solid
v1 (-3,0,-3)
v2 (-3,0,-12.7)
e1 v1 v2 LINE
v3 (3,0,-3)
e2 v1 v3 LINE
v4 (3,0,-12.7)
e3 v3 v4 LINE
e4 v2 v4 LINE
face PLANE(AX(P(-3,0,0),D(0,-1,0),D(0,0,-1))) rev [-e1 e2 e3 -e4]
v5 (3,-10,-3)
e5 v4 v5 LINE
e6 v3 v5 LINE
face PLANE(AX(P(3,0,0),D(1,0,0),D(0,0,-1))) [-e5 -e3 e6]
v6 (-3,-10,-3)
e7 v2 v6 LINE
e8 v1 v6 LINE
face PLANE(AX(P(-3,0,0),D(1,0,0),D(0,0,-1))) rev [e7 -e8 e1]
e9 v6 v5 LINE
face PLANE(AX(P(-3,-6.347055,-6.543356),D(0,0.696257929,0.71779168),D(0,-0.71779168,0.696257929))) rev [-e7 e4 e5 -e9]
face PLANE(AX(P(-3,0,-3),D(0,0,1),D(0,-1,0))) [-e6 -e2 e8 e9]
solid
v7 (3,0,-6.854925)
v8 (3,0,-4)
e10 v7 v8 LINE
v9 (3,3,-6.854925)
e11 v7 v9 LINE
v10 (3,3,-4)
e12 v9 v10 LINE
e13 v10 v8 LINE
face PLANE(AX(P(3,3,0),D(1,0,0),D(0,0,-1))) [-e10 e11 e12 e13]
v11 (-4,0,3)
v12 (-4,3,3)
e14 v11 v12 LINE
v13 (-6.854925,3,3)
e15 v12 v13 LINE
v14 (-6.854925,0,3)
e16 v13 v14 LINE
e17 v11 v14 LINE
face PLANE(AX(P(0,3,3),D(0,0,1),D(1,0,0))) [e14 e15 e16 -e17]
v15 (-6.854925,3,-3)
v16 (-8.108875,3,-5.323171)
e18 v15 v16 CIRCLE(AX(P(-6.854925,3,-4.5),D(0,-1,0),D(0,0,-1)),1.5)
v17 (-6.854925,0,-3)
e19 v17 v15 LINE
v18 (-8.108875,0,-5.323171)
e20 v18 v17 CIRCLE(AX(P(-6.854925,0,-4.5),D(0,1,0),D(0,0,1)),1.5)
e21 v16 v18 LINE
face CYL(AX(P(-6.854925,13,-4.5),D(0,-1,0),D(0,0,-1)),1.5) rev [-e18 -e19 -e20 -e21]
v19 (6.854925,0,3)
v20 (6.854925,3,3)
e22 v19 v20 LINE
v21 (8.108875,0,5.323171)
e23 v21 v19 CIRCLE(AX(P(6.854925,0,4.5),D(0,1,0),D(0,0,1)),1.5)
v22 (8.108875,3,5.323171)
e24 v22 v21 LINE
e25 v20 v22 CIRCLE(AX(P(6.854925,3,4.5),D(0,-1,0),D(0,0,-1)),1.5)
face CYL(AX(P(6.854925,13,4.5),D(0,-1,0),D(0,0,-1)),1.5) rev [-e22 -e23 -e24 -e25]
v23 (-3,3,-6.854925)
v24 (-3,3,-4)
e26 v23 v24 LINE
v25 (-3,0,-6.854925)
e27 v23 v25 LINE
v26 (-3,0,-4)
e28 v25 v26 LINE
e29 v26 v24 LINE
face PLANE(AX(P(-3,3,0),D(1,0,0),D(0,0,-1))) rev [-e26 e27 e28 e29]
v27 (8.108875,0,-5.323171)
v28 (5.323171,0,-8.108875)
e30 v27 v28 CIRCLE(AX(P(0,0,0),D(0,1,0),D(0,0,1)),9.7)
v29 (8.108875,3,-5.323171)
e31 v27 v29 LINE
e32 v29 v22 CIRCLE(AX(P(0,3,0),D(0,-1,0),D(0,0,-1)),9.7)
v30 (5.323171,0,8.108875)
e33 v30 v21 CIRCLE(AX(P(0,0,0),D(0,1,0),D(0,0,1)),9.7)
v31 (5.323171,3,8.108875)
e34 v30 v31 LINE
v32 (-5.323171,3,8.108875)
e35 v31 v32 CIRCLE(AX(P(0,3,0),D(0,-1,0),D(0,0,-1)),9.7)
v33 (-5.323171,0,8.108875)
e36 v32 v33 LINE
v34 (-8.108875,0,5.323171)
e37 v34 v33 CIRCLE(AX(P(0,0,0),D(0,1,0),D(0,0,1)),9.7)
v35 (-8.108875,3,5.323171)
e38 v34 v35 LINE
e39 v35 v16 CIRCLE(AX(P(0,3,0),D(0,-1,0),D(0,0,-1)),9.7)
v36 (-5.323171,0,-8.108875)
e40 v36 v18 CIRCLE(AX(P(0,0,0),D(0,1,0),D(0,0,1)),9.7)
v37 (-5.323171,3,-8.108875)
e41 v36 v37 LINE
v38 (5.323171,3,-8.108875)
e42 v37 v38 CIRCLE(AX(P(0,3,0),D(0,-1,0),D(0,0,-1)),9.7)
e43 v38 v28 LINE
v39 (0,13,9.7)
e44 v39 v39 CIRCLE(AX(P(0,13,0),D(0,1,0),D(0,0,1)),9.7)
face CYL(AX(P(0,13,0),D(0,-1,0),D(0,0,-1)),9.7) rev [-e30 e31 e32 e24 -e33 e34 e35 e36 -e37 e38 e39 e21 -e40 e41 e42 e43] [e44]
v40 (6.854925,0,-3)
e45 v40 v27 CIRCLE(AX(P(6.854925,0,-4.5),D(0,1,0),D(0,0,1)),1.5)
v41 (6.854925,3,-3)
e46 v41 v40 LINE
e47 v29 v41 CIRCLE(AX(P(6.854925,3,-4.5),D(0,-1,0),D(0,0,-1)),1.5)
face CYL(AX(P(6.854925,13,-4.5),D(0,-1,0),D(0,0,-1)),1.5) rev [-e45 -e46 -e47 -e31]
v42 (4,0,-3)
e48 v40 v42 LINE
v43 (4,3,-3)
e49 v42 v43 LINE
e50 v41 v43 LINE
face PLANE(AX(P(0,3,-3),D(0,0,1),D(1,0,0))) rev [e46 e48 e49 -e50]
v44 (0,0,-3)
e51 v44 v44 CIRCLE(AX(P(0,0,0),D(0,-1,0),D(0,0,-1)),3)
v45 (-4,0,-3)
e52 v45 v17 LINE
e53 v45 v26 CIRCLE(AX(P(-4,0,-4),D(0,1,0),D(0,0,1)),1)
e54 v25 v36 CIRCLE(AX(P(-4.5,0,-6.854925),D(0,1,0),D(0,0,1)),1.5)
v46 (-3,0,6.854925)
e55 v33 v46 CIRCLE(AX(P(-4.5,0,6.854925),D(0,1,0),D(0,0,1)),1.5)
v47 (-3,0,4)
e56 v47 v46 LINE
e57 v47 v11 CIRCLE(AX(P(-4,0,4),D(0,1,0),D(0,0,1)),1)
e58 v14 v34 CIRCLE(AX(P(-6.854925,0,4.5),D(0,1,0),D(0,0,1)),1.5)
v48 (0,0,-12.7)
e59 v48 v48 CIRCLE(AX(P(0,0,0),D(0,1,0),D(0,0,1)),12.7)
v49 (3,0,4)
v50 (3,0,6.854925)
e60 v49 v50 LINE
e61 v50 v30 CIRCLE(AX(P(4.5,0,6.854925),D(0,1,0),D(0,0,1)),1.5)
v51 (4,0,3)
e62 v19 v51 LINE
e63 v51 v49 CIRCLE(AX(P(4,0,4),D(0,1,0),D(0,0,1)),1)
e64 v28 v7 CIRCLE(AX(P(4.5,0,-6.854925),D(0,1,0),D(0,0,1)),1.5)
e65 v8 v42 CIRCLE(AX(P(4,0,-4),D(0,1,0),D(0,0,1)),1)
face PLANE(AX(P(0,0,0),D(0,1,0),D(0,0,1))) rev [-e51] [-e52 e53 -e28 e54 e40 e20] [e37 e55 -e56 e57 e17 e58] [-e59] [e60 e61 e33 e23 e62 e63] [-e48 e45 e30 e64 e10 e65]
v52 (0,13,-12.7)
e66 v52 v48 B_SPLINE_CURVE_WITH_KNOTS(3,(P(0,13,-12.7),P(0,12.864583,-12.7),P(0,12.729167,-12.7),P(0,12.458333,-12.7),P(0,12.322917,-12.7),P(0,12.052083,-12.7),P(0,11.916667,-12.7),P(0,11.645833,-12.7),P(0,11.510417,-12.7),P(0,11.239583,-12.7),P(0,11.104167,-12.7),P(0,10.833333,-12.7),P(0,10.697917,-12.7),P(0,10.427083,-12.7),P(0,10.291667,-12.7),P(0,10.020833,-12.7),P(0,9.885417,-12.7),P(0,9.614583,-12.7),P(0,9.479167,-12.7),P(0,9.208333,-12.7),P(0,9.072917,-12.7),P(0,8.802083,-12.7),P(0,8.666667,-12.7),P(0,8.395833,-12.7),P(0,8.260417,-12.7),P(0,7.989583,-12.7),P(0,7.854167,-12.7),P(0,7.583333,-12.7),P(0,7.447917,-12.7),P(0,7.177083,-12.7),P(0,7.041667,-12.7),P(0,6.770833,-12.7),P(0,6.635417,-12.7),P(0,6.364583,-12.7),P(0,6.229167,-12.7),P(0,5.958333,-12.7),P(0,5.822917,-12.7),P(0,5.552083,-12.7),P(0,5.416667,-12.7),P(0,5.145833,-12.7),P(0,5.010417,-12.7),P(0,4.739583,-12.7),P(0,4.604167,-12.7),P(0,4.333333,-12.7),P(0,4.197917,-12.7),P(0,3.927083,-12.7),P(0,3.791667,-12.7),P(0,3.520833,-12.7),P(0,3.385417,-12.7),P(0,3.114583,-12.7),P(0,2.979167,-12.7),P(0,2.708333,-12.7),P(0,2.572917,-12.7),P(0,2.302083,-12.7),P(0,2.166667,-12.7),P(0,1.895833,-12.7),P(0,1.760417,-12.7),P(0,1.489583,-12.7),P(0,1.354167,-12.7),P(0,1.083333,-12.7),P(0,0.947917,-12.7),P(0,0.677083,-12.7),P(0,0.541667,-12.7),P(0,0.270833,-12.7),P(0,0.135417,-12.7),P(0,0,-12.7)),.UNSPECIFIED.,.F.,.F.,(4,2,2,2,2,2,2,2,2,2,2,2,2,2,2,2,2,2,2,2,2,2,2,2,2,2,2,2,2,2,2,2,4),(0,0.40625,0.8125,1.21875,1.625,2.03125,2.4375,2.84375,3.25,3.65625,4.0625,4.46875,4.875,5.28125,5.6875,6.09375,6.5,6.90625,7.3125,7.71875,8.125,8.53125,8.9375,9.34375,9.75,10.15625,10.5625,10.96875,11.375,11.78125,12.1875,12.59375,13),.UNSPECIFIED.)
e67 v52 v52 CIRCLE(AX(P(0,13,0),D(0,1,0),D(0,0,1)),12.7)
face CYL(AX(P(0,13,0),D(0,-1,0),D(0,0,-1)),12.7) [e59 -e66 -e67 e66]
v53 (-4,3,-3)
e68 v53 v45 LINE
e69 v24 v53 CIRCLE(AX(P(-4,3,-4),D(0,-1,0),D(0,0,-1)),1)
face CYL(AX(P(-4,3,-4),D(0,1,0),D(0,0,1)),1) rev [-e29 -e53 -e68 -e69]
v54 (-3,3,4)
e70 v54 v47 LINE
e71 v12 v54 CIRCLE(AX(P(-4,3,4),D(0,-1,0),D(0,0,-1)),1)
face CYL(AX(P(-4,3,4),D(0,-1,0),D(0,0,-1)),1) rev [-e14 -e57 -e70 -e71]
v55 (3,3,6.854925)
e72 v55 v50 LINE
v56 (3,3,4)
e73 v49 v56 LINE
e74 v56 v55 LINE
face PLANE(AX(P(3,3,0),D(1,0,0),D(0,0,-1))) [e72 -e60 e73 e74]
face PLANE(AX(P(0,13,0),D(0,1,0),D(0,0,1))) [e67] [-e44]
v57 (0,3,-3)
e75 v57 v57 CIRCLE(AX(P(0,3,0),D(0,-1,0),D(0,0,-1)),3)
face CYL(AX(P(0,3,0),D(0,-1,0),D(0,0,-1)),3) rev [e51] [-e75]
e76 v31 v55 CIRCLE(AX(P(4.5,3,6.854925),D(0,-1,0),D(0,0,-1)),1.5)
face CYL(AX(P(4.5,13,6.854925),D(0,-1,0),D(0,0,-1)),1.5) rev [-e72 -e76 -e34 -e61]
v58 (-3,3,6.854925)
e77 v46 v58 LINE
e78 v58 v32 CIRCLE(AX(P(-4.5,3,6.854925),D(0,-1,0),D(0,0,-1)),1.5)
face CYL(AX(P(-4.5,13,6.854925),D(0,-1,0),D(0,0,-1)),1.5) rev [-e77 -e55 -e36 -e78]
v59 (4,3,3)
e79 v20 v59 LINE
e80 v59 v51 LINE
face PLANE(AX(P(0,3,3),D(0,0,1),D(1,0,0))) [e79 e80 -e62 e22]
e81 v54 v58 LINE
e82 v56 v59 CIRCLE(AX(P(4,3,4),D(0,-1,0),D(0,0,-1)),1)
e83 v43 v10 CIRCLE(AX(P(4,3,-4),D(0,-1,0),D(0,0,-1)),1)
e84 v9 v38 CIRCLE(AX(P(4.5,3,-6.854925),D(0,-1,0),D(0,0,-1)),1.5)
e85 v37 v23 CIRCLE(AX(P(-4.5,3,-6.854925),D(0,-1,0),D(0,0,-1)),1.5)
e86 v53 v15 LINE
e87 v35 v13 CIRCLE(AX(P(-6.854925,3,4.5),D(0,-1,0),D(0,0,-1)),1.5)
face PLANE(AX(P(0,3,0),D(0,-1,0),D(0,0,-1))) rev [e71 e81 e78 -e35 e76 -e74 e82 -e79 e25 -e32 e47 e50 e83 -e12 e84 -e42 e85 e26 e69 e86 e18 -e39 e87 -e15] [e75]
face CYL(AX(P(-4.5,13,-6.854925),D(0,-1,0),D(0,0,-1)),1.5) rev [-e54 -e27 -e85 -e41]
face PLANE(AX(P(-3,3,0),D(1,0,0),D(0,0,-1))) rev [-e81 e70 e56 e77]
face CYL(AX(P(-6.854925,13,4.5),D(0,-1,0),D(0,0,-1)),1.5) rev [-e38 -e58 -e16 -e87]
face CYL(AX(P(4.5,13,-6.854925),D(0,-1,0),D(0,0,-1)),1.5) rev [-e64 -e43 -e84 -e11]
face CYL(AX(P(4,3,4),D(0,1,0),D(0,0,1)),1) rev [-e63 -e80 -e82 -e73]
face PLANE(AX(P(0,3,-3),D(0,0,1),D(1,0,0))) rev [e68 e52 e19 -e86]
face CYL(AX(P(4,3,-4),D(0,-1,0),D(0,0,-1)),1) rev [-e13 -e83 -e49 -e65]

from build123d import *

# Parameters (mm, degrees)
ESBO_O1_R                     = 12.7
ESBO_O1_R_2                   = 9.7
RESSALTO_EXTRUS_O1_DEPTH      = 13
RESSALTO_EXTRUS_O7_DEPTH      = 3
FILETE1_R                     = 1.5
FILETE2_R                     = 1
RESSALTO_EXTRUS_O8_DEPTH      = 3
RESSALTO_EXTRUS_O8_DEPTH_BACK = 3


with BuildPart() as part:
    # Esboço1 → Ressalto-extrusão1 (new body)
    with BuildSketch(Plane(origin=(0, 0, 0), x_dir=(1, 0, 0), z_dir=(0, 1, 0))):
        with Locations(Location((0, 0, 0), (0, 0, 90))):
            Circle(ESBO_O1_R)
        with Locations(Location((0, 0, 0), (0, 0, 90))):
            Circle(ESBO_O1_R_2, mode=Mode.SUBTRACT)
    extrude(amount=RESSALTO_EXTRUS_O1_DEPTH)

    # Esboço5 → Ressalto-extrusão7 (add)
    with BuildSketch(Plane.XZ):
        with BuildLine():
            ThreePointArc((-10.270832488, -3), (-7.566042559, -7.566042559), (-3, -10.270832488))
            Line((-3, -10.270832488), (-3, -9.224424101))
            ThreePointArc((-3, -9.224424101), (-6.858935778, -6.858935778), (-9.224424101, -3))
            Line((-9.224424101, -3), (-10.270832488, -3))
        make_face()
        with BuildLine():
            ThreePointArc((-3, -10.270832488), (0, -10.7), (3, -10.270832488))
            Line((3, -10.270832488), (3, -9.224424101))
            ThreePointArc((3, -9.224424101), (0, -9.7), (-3, -9.224424101))
            Line((-3, -9.224424101), (-3, -10.270832488))
        make_face()
        with BuildLine():
            ThreePointArc((3, 10.270832488), (0, 10.7), (-3, 10.270832488))
            Line((-3, 10.270832488), (-3, 9.224424101))
            ThreePointArc((-3, 9.224424101), (0, 9.7), (3, 9.224424101))
            Line((3, 9.224424101), (3, 10.270832488))
        make_face()
        with BuildLine():
            Line((3, -9.224424101), (3, -10.270832488))
            ThreePointArc((3, -10.270832488), (7.566042559, -7.566042559), (10.270832488, -3))
            Line((10.270832488, -3), (9.224424101, -3))
            ThreePointArc((9.224424101, -3), (6.858935778, -6.858935778), (3, -9.224424101))
        make_face()
        with BuildLine():
            Line((9.224424101, -3), (10.270832488, -3))
            ThreePointArc((10.270832488, -3), (10.592164737, -1.515270995), (10.7, 0))
            ThreePointArc((10.7, 0), (10.592164737, 1.515270995), (10.270832488, 3))
            Line((10.270832488, 3), (9.224424101, 3))
            ThreePointArc((9.224424101, 3), (9.580368307, 1.518730756), (9.7, 0))
            ThreePointArc((9.7, 0), (9.580368307, -1.518730756), (9.224424101, -3))
        make_face()
        with BuildLine():
            ThreePointArc((-10.270832488, 3), (-10.7, 0), (-10.270832488, -3))
            Line((-10.270832488, -3), (-9.224424101, -3))
            ThreePointArc((-9.224424101, -3), (-9.7, 0), (-9.224424101, 3))
            Line((-9.224424101, 3), (-10.270832488, 3))
        make_face()
        with BuildLine():
            Line((9.224424101, 3), (10.270832488, 3))
            ThreePointArc((10.270832488, 3), (7.566042559, 7.566042559), (3, 10.270832488))
            Line((3, 10.270832488), (3, 9.224424101))
            ThreePointArc((3, 9.224424101), (6.858935778, 6.858935778), (9.224424101, 3))
        make_face()
        with BuildLine():
            ThreePointArc((-3, 10.270832488), (-7.566042559, 7.566042559), (-10.270832488, 3))
            Line((-10.270832488, 3), (-9.224424101, 3))
            ThreePointArc((-9.224424101, 3), (-6.858935778, 6.858935778), (-3, 9.224424101))
            Line((-3, 9.224424101), (-3, 10.270832488))
        make_face()
        with BuildLine():
            Line((-9.224424101, -3), (-3, -3))
            Line((-3, -3), (-3, 0))
            Line((-3, 0), (-3, 3))
            Line((-3, 3), (-9.224424101, 3))
            ThreePointArc((-9.224424101, 3), (-9.7, 0), (-9.224424101, -3))
        make_face()
        with BuildLine():
            ThreePointArc((-3, -9.224424101), (0, -9.7), (3, -9.224424101))
            Line((3, -9.224424101), (3, -3))
            Line((3, -3), (0, -3))
            Line((0, -3), (-3, -3))
            Line((-3, -3), (-3, -9.224424101))
        make_face()
        with BuildLine():
            Line((3, 0), (3, -3))
            Line((3, -3), (9.224424101, -3))
            ThreePointArc((9.224424101, -3), (9.580368307, -1.518730756), (9.7, 0))
            ThreePointArc((9.7, 0), (9.580368307, 1.518730756), (9.224424101, 3))
            Line((9.224424101, 3), (3, 3))
            Line((3, 3), (3, 0))
        make_face()
        with BuildLine():
            Line((0, -3), (3, -3))
            Line((3, -3), (3, 0))
            ThreePointArc((3, 0), (2.121320344, -2.121320344), (0, -3))
        make_face()
        with BuildLine():
            Line((-3, -3), (0, -3))
            ThreePointArc((0, -3), (-2.121320344, -2.121320344), (-3, 0))
            Line((-3, 0), (-3, -3))
        make_face()
        with BuildLine():
            ThreePointArc((-3, 0), (-2.121320344, 2.121320344), (0, 3))
            Line((0, 3), (-3, 3))
            Line((-3, 3), (-3, 0))
        make_face()
        with BuildLine():
            ThreePointArc((0, 3), (2.121320344, 2.121320344), (3, 0))
            Line((3, 0), (3, 3))
            Line((3, 3), (0, 3))
        make_face()
        with BuildLine():
            Line((0, 3), (3, 3))
            Line((3, 3), (3, 9.224424101))
            ThreePointArc((3, 9.224424101), (0, 9.7), (-3, 9.224424101))
            Line((-3, 9.224424101), (-3, 3))
            Line((-3, 3), (0, 3))
        make_face()
    extrude(amount=-RESSALTO_EXTRUS_O7_DEPTH)

    # Filete1
    # the kernel refuses this fillet: 1.5 mm, written as the material it adds along each edge
    with BuildSketch(Plane(origin=(-9.224424101, 0, -3), x_dir=(0.4328657802637883, 0, -0.9014583829975857), z_dir=(0, 1, 0)), Plane(origin=(-3, 0, 9.224424101), x_dir=(-0.9014583829975888, 0, -0.43286578026378153), z_dir=(0, 1, 0)), Plane(origin=(3, 0, -9.224424101), x_dir=(0.9014583829975941, 0, 0.4328657802637706), z_dir=(0, 1, 0)), Plane(origin=(9.224424101, 0, 3), x_dir=(-0.43286578026378625, 0, 0.9014583829975866), z_dir=(0, 1, 0))) as filete1_piece_1:
        with BuildLine():
            CenterArc((2.377862549, -1.486705945), FILETE1_R, 82.366178215, 123.283389503)
            Line((1.025674975, -2.136004615), (0, 0))
            ThreePointArc((0, 0), (1.288562387, 0.085968225), (2.577124774, 0))
        make_face()
    extrude(amount=3)
    with BuildSketch(Plane(origin=(-3, 0, -9.224424101), x_dir=(-0.9014583829975884, 0, 0.43286578026378264), z_dir=(0, 1, 0)), Plane(origin=(-9.224424101, 0, 3), x_dir=(0.4328657802637885, 0, 0.9014583829975855), z_dir=(0, 1, 0)), Plane(origin=(9.224424101, 0, -3), x_dir=(-0.43286578026378775, 0, -0.9014583829975858), z_dir=(0, 1, 0)), Plane(origin=(3, 0, 9.224424101), x_dir=(0.9014583829975935, 0, -0.43286578026377187), z_dir=(0, 1, 0))) as filete1_piece_2:
        with BuildLine():
            CenterArc((2.377862549, 1.486705945), FILETE1_R, 154.350432282, 123.283389503)
            Line((1.025674975, 2.136004615), (0, 0))
            ThreePointArc((0, 0), (1.288562387, -0.085968225), (2.577124774, 0))
        make_face()
    extrude(amount=3)

    # Filete2
    filete2_edges = [part.edges().sort_by_distance(p)[0] for p in [
        (3, 1.5, -3),
        (3, 1.5, 3),
        (-3, 1.5, 3),
        (-3, 1.5, -3),
    ]]
    fillet(filete2_edges, radius=FILETE2_R)


with BuildPart() as body_2:
    # Esboço6 → Ressalto-extrusão8 (new, two sides: drawn at the far end of the back side and taken through both)
    with BuildSketch(Plane(origin=(0, 0, 0), x_dir=(0, 0, -1), z_dir=(1, 0, 0)).offset(-RESSALTO_EXTRUS_O8_DEPTH_BACK)):
        Polygon((3, 0), (12.7, 0), (3, -10), align=None)
    extrude(amount=RESSALTO_EXTRUS_O8_DEPTH + RESSALTO_EXTRUS_O8_DEPTH_BACK)


solid = Compound([part.part, body_2.part])
